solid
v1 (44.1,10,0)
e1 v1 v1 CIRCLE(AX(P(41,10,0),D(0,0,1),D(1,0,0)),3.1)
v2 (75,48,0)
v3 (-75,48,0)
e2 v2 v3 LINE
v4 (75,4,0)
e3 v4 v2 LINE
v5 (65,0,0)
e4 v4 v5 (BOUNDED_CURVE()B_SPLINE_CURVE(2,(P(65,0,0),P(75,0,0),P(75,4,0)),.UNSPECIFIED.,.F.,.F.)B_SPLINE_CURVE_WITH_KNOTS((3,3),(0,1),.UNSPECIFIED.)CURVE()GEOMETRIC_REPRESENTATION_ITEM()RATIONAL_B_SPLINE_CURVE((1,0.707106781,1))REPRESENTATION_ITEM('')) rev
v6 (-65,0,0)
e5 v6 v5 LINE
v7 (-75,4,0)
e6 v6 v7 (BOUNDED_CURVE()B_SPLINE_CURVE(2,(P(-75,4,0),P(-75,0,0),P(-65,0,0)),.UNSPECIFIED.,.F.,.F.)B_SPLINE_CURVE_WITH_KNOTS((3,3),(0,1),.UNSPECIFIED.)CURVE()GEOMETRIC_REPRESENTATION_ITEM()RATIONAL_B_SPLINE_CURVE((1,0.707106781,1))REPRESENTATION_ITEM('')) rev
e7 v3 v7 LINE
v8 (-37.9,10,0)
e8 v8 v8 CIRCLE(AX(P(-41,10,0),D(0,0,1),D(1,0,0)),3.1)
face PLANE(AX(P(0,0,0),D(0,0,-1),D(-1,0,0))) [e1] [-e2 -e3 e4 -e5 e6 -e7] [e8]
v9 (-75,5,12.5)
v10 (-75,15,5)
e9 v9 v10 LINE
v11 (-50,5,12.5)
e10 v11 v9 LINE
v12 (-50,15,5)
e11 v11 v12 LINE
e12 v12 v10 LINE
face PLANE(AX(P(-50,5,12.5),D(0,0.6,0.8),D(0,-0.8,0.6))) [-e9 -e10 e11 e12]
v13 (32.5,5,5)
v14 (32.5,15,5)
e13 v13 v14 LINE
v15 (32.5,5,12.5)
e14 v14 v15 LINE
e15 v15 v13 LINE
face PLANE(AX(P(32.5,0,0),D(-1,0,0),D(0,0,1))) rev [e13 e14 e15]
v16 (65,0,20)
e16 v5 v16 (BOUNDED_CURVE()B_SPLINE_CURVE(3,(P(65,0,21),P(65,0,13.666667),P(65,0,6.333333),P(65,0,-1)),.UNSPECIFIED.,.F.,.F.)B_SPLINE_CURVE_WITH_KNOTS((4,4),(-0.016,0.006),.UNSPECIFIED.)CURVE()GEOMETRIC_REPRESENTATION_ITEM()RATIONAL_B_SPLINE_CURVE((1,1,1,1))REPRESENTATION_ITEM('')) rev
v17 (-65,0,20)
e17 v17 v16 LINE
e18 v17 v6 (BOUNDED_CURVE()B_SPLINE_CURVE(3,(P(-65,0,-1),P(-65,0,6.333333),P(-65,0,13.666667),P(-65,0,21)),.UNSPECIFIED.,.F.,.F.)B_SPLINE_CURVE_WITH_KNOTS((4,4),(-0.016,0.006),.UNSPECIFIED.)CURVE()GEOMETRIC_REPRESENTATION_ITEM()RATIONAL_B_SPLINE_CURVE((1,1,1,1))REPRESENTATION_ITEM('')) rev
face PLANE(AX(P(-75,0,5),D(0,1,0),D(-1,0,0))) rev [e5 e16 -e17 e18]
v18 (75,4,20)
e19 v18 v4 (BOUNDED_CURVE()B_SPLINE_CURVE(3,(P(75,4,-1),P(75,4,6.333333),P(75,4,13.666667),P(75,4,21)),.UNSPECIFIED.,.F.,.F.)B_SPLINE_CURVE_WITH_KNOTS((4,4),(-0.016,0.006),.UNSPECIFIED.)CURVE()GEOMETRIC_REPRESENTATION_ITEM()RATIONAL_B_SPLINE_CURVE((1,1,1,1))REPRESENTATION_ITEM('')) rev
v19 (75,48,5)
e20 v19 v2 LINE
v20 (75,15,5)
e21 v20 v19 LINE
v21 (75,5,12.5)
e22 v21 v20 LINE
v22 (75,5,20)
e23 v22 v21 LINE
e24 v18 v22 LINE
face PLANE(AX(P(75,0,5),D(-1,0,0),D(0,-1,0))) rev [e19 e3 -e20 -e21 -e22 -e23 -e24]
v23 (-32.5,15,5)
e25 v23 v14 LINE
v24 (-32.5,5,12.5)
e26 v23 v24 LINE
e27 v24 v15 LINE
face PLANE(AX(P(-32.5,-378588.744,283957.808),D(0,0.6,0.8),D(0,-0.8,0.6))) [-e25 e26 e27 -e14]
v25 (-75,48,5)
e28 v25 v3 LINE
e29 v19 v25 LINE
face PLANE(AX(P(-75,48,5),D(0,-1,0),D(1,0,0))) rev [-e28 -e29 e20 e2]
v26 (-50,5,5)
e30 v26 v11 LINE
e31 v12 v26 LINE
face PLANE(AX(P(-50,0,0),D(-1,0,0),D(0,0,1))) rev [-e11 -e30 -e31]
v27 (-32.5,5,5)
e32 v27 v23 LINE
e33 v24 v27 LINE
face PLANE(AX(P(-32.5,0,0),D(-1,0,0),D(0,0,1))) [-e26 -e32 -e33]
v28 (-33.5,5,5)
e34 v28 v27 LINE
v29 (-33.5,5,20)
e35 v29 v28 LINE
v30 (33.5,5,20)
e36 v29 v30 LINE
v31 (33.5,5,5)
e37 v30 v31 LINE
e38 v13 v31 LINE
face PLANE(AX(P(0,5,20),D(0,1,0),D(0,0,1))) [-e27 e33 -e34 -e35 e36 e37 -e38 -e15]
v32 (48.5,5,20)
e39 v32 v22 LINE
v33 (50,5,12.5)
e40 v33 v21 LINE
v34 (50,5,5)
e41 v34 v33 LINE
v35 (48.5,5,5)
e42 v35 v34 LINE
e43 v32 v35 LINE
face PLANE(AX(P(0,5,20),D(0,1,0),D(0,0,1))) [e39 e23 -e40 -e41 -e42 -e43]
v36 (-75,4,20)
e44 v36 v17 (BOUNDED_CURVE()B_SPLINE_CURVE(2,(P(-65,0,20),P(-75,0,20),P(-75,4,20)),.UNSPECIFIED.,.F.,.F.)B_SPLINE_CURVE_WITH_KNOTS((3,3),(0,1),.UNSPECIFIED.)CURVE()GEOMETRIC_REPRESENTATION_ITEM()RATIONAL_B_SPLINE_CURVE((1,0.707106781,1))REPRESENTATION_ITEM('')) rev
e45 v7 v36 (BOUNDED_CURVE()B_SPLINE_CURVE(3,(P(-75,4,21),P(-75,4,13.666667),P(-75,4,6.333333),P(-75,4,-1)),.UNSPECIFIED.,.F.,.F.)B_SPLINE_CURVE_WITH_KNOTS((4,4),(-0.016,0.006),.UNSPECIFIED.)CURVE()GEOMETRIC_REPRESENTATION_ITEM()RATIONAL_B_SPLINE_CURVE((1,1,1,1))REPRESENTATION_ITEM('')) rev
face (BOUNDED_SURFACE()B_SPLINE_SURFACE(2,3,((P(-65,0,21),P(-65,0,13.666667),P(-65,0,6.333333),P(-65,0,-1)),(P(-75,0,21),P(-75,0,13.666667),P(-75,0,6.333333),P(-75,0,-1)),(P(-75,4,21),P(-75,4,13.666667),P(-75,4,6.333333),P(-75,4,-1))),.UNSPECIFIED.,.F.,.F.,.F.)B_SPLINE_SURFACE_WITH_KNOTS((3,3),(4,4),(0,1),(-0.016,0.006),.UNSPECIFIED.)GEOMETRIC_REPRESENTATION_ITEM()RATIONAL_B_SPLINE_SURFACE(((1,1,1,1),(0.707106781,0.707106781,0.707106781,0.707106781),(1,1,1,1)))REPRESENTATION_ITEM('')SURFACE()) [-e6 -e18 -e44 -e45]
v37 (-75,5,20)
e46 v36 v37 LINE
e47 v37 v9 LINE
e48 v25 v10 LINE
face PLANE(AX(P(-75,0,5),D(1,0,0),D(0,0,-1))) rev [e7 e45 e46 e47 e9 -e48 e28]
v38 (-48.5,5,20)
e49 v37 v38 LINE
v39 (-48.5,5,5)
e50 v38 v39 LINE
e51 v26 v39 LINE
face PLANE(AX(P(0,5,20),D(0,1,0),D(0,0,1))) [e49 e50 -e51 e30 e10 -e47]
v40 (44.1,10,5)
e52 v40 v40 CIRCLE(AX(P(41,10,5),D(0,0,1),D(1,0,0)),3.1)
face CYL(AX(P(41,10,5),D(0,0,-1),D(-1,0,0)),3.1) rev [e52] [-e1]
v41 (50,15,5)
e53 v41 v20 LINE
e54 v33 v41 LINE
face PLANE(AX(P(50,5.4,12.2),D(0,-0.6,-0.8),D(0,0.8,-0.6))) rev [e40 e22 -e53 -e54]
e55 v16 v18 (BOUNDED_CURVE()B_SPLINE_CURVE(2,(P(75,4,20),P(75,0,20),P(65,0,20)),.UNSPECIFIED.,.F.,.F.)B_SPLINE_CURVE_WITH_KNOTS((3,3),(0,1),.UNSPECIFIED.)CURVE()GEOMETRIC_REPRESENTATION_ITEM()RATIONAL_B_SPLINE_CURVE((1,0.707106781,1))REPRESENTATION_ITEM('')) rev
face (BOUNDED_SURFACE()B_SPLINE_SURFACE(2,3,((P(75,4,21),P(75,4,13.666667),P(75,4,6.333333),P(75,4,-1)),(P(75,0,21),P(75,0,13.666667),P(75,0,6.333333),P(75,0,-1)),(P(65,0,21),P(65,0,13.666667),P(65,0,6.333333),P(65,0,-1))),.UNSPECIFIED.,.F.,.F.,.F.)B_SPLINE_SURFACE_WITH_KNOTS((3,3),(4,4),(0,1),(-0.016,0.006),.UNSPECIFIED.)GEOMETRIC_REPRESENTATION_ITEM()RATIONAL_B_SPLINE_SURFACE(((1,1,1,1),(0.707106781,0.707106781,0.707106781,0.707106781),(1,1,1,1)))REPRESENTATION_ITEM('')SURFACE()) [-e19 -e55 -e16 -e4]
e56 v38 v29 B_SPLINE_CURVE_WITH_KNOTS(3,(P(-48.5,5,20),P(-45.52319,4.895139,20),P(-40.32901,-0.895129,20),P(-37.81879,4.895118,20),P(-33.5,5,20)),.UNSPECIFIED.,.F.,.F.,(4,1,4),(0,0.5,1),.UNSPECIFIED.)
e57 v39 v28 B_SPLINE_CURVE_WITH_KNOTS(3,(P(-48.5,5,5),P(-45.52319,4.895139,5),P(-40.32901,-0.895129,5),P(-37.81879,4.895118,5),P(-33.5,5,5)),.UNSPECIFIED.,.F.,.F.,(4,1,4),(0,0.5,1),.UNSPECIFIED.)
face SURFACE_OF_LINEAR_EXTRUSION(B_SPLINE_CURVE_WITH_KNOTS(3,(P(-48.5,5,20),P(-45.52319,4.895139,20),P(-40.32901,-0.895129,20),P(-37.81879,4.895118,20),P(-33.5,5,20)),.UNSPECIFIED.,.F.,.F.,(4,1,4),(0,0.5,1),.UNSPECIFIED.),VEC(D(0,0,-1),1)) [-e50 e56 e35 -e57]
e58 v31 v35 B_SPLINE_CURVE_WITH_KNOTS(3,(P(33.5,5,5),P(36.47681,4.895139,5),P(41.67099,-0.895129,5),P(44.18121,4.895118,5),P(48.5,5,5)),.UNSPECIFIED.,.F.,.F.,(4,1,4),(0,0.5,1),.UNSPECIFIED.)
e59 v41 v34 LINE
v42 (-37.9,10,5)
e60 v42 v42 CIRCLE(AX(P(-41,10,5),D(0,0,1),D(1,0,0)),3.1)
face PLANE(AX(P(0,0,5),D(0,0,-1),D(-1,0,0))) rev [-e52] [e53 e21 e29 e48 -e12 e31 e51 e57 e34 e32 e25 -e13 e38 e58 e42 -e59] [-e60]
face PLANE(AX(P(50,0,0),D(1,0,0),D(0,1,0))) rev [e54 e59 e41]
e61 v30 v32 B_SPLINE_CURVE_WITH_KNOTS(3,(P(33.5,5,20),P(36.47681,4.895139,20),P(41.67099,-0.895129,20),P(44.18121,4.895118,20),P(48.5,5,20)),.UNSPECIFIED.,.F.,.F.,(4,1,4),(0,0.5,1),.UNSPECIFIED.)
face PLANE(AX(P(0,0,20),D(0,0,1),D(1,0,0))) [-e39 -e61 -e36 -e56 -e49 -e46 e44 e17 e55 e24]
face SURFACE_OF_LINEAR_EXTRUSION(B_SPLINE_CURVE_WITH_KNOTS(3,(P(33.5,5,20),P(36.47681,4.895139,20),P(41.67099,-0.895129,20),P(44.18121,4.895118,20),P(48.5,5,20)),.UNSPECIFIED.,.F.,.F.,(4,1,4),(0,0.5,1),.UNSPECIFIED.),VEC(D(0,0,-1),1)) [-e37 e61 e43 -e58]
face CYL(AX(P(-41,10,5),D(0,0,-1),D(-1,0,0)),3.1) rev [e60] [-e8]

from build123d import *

# Parameters (mm, degrees)
SKETCH1_W           = 150
SKETCH1_H           = 48
SKETCH1_R           = 3.1
BOSS_EXTRUDE1_DEPTH = 5
BOSS_EXTRUDE2_DEPTH = 20
BOSS_EXTRUDE3_DEPTH = 25
BOSS_EXTRUDE4_START = -150
BOSS_EXTRUDE4_DEPTH = 25
BOSS_EXTRUDE5_START = -75
BOSS_EXTRUDE5_DEPTH = 32.5
FILLET5_SIZE        = 10
FILLET5_SIZE_2      = 4
FILLET6_SIZE        = 10
FILLET6_SIZE_2      = 4


with BuildPart() as part:
    # Sketch1 → Boss-Extrude1 (new body)
    with BuildSketch(Plane.XY):
        with Locations((0, 24)):
            Rectangle(SKETCH1_W, SKETCH1_H)
        with Locations((-41, 10)):
            Circle(SKETCH1_R, mode=Mode.SUBTRACT)
        with Locations((41, 10)):
            Circle(SKETCH1_R, mode=Mode.SUBTRACT)
    extrude(amount=BOSS_EXTRUDE1_DEPTH)

    # Sketch2 → Boss-Extrude2 (add)
    with BuildSketch(Plane.XY):
        with BuildLine():
            Line((-75, 5), (-75, 0))
            Line((-75, 0), (75, 0))
            Line((75, 0), (75, 5))
            Line((75, 5), (48.5, 5))
            add(Edge.make_bspline(
                [(33.5, 5), (36.476810307, 4.895138539), (41.670990079, -0.895128503), (44.181209535, 4.895118466), (48.5, 5)],
                knots=[0, 0, 0, 0, 0.5, 1, 1, 1, 1], degree=3))
            Line((33.5, 5), (-33.5, 5))
            add(Edge.make_bspline(
                [(-48.5, 5), (-45.523189693, 4.895138539), (-40.329009921, -0.895128503), (-37.818790465, 4.895118466), (-33.5, 5)],
                knots=[0, 0, 0, 0, 0.5, 1, 1, 1, 1], degree=3))
            Line((-48.5, 5), (-75, 5))
        make_face()
    extrude(amount=BOSS_EXTRUDE2_DEPTH)

    # Sketch4 → Boss-Extrude3 (add)
    with BuildSketch(Plane.ZY.offset(75)):
        Polygon((5, 5), (12.5, 5), (5, 15), align=None)
    extrude(amount=-BOSS_EXTRUDE3_DEPTH)

    # Sketch4<2> → Boss-Extrude4 (add)
    with BuildSketch(Plane.ZY.offset(75).offset(BOSS_EXTRUDE4_START)):
        Polygon((5, 5), (12.5, 5), (5, 15), align=None)
    extrude(amount=BOSS_EXTRUDE4_DEPTH)

    # Sketch4<3> → Boss-Extrude5 (add, symmetric)
    with BuildSketch(Plane.ZY.offset(75).offset(BOSS_EXTRUDE5_START)):
        Polygon((5, 5), (12.5, 5), (5, 15), align=None)
    extrude(amount=BOSS_EXTRUDE5_DEPTH, both=True)

    # Fillet5
    # an asymmetric fillet: 10, 4 mm, written as the material it takes off along each edge
    with BuildSketch(Plane(origin=(-75, 0, 45), x_dir=(1, 0, 0), z_dir=(0, 0, -1))) as fillet5_piece_1:
        with BuildLine():
            Bezier((FILLET5_SIZE, 0), (0, 0), (0, -FILLET5_SIZE_2), weights=[1, 0.707106781, 1])
            Line((0, -FILLET5_SIZE_2), (0, 0))
            Line((0, 0), (FILLET5_SIZE, 0))
        make_face()
    extrude(amount=70, mode=Mode.SUBTRACT)

    # Fillet6
    # an asymmetric fillet: 10, 4 mm, written as the material it takes off along each edge
    with BuildSketch(Plane(origin=(75, 0, -25), x_dir=(-1, 0, 0), z_dir=(0, 0, 1))) as fillet6_piece_1:
        with BuildLine():
            Bezier((FILLET6_SIZE, 0), (0, 0), (0, -FILLET6_SIZE_2), weights=[1, 0.707106781, 1])
            Line((0, -FILLET6_SIZE_2), (0, 0))
            Line((0, 0), (FILLET6_SIZE, 0))
        make_face()
    extrude(amount=70, mode=Mode.SUBTRACT)


solid = part.part
